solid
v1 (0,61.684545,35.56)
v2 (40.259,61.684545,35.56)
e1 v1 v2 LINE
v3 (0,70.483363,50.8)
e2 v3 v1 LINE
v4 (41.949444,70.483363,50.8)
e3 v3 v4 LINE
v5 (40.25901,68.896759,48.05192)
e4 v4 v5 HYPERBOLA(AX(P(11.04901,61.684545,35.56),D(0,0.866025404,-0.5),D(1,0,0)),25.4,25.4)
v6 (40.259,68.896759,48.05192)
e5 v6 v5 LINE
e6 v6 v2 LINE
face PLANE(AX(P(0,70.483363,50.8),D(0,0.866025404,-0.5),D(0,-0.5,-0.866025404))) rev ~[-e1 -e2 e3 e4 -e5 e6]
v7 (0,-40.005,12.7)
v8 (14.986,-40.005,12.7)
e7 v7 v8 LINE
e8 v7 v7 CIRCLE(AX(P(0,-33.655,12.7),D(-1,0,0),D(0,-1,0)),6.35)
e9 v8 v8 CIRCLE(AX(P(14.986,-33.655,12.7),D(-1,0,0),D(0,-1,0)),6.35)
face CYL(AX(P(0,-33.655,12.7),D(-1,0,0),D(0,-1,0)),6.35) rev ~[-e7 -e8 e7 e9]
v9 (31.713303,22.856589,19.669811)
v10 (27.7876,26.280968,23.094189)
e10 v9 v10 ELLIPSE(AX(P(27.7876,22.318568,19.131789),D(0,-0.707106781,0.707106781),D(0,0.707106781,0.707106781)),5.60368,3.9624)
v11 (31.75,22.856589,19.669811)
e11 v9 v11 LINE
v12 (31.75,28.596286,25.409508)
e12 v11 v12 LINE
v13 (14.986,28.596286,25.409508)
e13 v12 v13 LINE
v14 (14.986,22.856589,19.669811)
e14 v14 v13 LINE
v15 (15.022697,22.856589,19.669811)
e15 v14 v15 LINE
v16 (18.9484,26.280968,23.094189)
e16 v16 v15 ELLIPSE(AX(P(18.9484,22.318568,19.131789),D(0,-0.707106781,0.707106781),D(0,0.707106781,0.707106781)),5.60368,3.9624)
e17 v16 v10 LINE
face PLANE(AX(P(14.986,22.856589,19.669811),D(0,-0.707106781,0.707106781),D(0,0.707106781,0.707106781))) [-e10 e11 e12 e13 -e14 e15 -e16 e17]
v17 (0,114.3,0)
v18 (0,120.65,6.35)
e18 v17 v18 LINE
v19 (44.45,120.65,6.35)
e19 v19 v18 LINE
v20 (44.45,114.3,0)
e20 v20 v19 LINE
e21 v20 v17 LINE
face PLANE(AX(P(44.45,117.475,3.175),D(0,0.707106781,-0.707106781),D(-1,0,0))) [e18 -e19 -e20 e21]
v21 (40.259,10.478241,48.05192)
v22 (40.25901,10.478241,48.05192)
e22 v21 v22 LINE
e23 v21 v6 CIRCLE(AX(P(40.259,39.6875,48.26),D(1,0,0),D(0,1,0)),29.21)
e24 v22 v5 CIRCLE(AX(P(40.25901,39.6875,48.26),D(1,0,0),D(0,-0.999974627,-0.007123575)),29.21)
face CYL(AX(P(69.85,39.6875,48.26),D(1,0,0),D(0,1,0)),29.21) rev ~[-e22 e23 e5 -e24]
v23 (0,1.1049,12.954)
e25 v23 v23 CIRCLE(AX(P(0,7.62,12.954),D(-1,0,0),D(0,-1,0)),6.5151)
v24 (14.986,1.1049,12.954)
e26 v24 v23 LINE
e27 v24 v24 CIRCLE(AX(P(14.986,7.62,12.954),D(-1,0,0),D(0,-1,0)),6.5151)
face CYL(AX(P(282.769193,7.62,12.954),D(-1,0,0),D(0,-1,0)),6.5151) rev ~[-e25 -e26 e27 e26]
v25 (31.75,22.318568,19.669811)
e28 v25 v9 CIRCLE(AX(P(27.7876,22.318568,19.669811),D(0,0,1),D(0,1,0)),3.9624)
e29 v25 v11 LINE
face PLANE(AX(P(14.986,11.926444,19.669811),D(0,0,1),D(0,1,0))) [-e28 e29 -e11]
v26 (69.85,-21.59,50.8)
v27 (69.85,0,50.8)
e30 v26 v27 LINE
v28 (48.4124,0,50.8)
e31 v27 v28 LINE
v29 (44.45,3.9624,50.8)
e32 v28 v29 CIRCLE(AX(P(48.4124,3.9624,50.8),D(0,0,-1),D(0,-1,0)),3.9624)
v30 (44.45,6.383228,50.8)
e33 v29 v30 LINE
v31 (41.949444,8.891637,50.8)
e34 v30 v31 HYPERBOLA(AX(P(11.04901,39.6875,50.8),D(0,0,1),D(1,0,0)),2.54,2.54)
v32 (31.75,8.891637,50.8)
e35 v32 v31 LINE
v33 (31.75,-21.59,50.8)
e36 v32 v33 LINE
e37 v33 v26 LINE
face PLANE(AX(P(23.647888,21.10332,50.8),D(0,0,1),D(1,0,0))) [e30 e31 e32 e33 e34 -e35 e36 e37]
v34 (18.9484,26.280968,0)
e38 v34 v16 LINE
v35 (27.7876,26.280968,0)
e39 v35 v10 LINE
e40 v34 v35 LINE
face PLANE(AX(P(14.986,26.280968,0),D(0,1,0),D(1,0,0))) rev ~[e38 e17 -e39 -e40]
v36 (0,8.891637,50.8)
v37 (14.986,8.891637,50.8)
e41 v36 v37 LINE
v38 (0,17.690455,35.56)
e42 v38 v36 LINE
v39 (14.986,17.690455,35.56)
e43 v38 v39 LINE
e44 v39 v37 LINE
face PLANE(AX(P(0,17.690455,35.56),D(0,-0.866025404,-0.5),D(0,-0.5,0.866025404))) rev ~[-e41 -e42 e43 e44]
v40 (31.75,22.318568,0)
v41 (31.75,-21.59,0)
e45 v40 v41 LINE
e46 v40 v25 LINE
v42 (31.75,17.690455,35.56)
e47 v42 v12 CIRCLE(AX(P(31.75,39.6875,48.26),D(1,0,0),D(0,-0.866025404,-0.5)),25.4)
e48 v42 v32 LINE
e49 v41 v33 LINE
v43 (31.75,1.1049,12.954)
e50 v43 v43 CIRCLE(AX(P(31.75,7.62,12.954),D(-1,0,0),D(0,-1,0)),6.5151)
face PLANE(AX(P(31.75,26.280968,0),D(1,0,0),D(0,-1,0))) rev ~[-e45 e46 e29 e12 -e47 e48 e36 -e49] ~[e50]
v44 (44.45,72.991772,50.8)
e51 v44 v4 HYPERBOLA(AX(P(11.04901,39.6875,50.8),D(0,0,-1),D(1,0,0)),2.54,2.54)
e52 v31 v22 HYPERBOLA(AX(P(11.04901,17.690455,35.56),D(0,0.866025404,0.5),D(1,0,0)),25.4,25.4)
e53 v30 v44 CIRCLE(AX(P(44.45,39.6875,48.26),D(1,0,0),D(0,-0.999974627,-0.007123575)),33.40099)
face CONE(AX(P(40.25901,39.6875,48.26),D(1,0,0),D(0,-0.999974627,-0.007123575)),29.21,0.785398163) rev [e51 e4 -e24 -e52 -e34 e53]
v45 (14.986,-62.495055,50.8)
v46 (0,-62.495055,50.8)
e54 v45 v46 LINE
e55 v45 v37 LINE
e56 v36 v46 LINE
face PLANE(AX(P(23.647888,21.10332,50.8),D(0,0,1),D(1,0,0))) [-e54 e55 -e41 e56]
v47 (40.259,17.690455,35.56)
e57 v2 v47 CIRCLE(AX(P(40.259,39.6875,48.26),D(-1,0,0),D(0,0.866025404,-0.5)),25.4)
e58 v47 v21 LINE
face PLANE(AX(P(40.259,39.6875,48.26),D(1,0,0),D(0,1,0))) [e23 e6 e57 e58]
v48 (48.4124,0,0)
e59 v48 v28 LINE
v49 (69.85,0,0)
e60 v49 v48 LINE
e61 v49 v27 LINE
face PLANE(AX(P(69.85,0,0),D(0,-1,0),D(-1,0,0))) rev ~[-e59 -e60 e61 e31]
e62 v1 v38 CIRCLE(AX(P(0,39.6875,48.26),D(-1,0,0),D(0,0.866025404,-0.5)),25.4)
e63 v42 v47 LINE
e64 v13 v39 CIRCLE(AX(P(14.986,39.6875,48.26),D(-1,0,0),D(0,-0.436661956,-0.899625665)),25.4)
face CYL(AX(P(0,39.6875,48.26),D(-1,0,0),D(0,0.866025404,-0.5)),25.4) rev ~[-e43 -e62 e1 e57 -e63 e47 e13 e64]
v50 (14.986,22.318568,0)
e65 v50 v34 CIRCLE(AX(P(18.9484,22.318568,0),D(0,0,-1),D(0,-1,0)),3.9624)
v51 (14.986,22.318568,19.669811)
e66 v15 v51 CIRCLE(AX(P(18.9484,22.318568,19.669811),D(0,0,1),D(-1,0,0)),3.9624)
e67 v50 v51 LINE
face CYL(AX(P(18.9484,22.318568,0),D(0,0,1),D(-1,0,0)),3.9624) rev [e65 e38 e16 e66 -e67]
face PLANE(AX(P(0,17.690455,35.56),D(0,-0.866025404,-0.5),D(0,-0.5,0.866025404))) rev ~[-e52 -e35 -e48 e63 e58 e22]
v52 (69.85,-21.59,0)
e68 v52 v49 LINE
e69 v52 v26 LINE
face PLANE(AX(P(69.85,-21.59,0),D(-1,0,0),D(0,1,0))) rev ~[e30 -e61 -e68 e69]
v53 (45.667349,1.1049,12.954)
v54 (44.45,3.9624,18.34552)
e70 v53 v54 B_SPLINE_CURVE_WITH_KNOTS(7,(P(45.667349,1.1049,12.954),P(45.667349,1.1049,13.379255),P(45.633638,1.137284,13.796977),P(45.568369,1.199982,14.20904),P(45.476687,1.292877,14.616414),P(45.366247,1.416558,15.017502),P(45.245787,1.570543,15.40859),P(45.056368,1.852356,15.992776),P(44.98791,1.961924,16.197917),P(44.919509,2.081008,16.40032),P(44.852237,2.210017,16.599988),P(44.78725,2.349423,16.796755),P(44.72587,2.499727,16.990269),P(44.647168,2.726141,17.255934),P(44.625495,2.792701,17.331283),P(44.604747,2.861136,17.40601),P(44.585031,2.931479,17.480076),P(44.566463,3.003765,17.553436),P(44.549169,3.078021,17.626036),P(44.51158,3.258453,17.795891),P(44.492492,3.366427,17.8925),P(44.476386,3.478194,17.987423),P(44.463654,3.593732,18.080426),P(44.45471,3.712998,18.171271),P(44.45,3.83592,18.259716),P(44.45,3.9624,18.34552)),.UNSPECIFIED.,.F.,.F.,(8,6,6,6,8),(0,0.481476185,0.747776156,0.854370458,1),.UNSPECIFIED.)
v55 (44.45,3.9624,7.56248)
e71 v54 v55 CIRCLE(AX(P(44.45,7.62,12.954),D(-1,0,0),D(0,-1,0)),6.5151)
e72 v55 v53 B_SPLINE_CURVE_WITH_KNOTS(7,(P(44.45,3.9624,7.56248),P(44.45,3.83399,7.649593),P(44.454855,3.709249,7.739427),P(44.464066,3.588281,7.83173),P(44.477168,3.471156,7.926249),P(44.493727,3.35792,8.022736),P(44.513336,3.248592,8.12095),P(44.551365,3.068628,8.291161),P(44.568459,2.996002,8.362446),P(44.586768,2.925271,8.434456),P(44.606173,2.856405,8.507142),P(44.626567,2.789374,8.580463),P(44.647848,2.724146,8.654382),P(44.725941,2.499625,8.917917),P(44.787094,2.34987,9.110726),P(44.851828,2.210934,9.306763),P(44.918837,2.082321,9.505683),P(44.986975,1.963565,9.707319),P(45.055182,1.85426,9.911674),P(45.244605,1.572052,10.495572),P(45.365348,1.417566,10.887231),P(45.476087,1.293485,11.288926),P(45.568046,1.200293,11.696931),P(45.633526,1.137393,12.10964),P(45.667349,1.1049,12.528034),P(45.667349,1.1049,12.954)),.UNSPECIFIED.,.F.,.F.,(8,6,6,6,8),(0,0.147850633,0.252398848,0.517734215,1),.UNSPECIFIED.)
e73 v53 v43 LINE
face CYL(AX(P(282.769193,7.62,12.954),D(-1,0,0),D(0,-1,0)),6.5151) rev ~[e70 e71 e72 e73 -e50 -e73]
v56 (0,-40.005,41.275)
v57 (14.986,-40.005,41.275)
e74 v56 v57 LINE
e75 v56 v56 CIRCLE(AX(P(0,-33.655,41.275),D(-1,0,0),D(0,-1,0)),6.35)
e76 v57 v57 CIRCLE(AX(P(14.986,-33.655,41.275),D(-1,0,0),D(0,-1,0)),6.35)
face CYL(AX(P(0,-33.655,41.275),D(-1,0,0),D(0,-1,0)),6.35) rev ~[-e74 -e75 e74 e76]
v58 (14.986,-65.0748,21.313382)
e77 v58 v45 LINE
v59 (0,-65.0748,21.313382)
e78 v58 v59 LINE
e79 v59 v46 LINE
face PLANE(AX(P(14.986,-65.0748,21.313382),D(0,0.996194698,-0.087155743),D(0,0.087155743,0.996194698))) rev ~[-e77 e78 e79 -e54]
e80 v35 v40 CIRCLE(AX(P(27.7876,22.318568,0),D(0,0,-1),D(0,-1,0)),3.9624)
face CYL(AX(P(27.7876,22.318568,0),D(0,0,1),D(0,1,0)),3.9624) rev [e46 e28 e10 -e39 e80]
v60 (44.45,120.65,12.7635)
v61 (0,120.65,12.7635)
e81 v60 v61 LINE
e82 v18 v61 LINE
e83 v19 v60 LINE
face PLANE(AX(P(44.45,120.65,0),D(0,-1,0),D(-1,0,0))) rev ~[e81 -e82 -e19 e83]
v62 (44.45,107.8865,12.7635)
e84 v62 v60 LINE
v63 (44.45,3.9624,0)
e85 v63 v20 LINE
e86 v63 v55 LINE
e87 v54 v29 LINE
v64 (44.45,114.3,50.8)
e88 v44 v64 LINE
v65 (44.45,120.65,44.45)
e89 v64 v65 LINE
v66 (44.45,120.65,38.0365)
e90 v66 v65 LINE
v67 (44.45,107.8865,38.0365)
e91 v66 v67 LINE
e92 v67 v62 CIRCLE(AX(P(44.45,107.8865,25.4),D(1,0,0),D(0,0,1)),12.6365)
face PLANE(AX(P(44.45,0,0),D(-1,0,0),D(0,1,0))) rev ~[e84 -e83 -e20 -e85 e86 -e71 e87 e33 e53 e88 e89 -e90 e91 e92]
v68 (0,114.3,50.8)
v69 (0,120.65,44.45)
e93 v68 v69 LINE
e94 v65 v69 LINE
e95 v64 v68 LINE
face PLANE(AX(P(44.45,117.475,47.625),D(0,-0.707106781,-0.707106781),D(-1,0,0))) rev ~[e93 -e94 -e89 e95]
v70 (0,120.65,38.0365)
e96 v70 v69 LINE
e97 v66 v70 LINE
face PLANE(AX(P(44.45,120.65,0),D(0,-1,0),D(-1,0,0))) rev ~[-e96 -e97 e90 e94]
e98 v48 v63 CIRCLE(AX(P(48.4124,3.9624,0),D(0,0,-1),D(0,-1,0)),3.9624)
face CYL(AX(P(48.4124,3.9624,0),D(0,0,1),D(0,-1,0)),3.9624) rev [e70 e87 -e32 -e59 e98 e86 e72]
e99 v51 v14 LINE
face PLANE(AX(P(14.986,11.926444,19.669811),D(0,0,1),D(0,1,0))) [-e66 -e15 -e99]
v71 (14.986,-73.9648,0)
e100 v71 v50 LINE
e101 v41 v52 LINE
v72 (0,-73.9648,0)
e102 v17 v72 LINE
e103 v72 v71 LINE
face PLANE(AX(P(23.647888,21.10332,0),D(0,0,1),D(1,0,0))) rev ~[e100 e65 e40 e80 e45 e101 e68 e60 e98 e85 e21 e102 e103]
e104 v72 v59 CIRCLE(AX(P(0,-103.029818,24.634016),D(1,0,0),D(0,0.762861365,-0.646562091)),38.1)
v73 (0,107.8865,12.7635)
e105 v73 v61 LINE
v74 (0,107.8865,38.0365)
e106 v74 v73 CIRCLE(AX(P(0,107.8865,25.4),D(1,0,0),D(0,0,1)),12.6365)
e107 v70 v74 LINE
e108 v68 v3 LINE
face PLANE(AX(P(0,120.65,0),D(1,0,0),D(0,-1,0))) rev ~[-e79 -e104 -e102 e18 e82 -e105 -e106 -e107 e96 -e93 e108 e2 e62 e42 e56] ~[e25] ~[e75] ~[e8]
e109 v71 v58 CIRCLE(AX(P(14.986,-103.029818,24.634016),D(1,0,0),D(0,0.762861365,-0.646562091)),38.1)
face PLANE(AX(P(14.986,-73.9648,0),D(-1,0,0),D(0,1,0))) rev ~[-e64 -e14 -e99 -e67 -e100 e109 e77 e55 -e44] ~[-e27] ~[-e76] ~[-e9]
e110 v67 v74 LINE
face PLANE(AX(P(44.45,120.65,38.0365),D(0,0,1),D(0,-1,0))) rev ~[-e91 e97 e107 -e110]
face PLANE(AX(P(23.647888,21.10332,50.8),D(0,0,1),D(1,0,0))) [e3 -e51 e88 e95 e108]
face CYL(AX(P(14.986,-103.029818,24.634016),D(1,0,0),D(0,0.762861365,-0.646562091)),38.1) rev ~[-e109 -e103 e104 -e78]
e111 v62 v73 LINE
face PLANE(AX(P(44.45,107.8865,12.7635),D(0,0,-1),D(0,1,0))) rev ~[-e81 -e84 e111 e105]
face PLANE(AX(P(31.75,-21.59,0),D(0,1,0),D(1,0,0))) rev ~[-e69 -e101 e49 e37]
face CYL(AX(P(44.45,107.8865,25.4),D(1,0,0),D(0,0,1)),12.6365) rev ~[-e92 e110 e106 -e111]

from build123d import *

# Parameters (mm, degrees)
F1_DEPTH  = 50.8
F2_R      = 3.9624
F3_SIZE   = 6.35
F5_DEPTH  = 44.451
F7_D      = 13.0302
F9_DEPTH  = 69.851
F10_R     = 29.21
F11_DEPTH = 29.591
F12_SIZE  = 4.19099
F14_DEPTH = 14.9870001
F16_DEPTH = 16.764
F17_R     = 6.35
F18_DEPTH = 69.851


# Not quite as in the source:
# - a fillet or chamfer is up to 0.001 mm smaller than in the source, because OpenCascade refuses the exact size


with BuildPart() as f1:
    # F0 (on Top) → F1 (new body)
    with BuildSketch(Plane.XY):
        Polygon((44.45, 120.65), (0, 120.65), (0, 0), (0, -21.59), (0, -73.9648), (14.986, -73.9648), (14.986, 26.2809675187), (31.75, 26.2809675187), (31.75, -21.59), (69.85, -21.59), (69.85, 0), (44.45, 0), align=None)
    extrude(amount=F1_DEPTH)

    # F2
    f2_edges = [f1.edges().sort_by_distance(p)[0] for p in [
        (44.45, 0, 25.4),
        (14.986, 26.280968, 25.4),
        (31.75, 26.280968, 25.4),
    ]]
    fillet(f2_edges, radius=F2_R)

    # F3
    f3_edges = [f1.edges().sort_by_distance(p)[0] for p in [
        (22.225, 120.65, 50.8),
        (22.225, 120.65, 0),
    ]]
    chamfer(f3_edges, length=F3_SIZE)

    # F4 (on face) → F5 (cut, through all)
    with BuildSketch(Plane.YZ.offset(44.45)):
        with BuildLine():
            Line((120.65, 38.0365), (107.8865, 38.0365))
            ThreePointArc((107.8865, 38.0365), (95.25, 25.4), (107.8865, 12.7635))
            Line((107.8865, 12.7635), (120.65, 12.7635))
            Line((120.65, 12.7635), (120.65, 38.0365))
        make_face()
    extrude(amount=-F5_DEPTH, mode=Mode.SUBTRACT)

    # F7 (through all)
    with Locations(Plane.YZ.offset(69.85)):
        with Locations((7.62, 12.954)):
            Hole(F7_D / 2)

    # F8 (on face) → F9 (cut, through all)
    with BuildSketch(Plane(origin=(0, 0, 0), x_dir=(0, -1, 0), z_dir=(-1, 0, 0))):
        with BuildLine():
            Line((-8.8916366414, 50.8), (-70.4833633586, 50.8))
            Line((-70.4833633586, 50.8), (-61.6845452561, 35.56))
            ThreePointArc((-61.6845452561, 35.56), (-39.6875, 22.86), (-17.6904547439, 35.56))
            Line((-17.6904547439, 35.56), (-8.8916366414, 50.8))
        make_face()
    extrude(amount=-F9_DEPTH, mode=Mode.SUBTRACT)

    # F10 (on face) → F11 (cut)
    with BuildSketch(Plane.YZ.offset(69.85)):
        with Locations((39.6875, 48.26)):
            Circle(F10_R)
    extrude(amount=-F11_DEPTH, mode=Mode.SUBTRACT)

    # F12 (size 4.191 in the source; OpenCascade refuses exactly that, so slightly less here)
    f12_edges = [f1.edges().sort_by_distance(p)[0] for p in [
        (44.45, 39.6875, 19.05),
    ]]
    chamfer(f12_edges, length=F12_SIZE)

    # F13 (on face) → F14 (cut, through all)
    with BuildSketch(Plane.YZ.offset(14.986)):
        with BuildLine():
            Line((-73.9648, 50.8), (-73.9648, 0))
            ThreePointArc((-73.9648, 0), (-67.8661098873, 9.9669221787), (-65.0748, 21.3133818873))
            Line((-65.0748, 21.3133818873), (-62.4950551894, 50.8))
            Line((-62.4950551894, 50.8), (-73.9648, 50.8))
        make_face()
    extrude(amount=-F14_DEPTH, mode=Mode.SUBTRACT)

    # F15 (on face) → F16 (cut, through all)
    with BuildSketch(Plane.YZ.offset(14.986)):
        Polygon((11.9264439221, 19.6698105436), (22.8565887415, 19.6698105436), (41.9241071546, 38.7373289567), (11.9264439221, 38.7373289567), align=None)
    extrude(amount=F16_DEPTH, mode=Mode.SUBTRACT)

    # F17 (on face) → F18 (cut, through all)
    with BuildSketch(Plane(origin=(0, 0, 0), x_dir=(0, -1, 0), z_dir=(-1, 0, 0))):
        with Locations((33.655, 12.7)):
            Circle(F17_R)
        with Locations((33.655, 41.275)):
            Circle(F17_R)
    extrude(amount=-F18_DEPTH, mode=Mode.SUBTRACT)


solid = f1.part
